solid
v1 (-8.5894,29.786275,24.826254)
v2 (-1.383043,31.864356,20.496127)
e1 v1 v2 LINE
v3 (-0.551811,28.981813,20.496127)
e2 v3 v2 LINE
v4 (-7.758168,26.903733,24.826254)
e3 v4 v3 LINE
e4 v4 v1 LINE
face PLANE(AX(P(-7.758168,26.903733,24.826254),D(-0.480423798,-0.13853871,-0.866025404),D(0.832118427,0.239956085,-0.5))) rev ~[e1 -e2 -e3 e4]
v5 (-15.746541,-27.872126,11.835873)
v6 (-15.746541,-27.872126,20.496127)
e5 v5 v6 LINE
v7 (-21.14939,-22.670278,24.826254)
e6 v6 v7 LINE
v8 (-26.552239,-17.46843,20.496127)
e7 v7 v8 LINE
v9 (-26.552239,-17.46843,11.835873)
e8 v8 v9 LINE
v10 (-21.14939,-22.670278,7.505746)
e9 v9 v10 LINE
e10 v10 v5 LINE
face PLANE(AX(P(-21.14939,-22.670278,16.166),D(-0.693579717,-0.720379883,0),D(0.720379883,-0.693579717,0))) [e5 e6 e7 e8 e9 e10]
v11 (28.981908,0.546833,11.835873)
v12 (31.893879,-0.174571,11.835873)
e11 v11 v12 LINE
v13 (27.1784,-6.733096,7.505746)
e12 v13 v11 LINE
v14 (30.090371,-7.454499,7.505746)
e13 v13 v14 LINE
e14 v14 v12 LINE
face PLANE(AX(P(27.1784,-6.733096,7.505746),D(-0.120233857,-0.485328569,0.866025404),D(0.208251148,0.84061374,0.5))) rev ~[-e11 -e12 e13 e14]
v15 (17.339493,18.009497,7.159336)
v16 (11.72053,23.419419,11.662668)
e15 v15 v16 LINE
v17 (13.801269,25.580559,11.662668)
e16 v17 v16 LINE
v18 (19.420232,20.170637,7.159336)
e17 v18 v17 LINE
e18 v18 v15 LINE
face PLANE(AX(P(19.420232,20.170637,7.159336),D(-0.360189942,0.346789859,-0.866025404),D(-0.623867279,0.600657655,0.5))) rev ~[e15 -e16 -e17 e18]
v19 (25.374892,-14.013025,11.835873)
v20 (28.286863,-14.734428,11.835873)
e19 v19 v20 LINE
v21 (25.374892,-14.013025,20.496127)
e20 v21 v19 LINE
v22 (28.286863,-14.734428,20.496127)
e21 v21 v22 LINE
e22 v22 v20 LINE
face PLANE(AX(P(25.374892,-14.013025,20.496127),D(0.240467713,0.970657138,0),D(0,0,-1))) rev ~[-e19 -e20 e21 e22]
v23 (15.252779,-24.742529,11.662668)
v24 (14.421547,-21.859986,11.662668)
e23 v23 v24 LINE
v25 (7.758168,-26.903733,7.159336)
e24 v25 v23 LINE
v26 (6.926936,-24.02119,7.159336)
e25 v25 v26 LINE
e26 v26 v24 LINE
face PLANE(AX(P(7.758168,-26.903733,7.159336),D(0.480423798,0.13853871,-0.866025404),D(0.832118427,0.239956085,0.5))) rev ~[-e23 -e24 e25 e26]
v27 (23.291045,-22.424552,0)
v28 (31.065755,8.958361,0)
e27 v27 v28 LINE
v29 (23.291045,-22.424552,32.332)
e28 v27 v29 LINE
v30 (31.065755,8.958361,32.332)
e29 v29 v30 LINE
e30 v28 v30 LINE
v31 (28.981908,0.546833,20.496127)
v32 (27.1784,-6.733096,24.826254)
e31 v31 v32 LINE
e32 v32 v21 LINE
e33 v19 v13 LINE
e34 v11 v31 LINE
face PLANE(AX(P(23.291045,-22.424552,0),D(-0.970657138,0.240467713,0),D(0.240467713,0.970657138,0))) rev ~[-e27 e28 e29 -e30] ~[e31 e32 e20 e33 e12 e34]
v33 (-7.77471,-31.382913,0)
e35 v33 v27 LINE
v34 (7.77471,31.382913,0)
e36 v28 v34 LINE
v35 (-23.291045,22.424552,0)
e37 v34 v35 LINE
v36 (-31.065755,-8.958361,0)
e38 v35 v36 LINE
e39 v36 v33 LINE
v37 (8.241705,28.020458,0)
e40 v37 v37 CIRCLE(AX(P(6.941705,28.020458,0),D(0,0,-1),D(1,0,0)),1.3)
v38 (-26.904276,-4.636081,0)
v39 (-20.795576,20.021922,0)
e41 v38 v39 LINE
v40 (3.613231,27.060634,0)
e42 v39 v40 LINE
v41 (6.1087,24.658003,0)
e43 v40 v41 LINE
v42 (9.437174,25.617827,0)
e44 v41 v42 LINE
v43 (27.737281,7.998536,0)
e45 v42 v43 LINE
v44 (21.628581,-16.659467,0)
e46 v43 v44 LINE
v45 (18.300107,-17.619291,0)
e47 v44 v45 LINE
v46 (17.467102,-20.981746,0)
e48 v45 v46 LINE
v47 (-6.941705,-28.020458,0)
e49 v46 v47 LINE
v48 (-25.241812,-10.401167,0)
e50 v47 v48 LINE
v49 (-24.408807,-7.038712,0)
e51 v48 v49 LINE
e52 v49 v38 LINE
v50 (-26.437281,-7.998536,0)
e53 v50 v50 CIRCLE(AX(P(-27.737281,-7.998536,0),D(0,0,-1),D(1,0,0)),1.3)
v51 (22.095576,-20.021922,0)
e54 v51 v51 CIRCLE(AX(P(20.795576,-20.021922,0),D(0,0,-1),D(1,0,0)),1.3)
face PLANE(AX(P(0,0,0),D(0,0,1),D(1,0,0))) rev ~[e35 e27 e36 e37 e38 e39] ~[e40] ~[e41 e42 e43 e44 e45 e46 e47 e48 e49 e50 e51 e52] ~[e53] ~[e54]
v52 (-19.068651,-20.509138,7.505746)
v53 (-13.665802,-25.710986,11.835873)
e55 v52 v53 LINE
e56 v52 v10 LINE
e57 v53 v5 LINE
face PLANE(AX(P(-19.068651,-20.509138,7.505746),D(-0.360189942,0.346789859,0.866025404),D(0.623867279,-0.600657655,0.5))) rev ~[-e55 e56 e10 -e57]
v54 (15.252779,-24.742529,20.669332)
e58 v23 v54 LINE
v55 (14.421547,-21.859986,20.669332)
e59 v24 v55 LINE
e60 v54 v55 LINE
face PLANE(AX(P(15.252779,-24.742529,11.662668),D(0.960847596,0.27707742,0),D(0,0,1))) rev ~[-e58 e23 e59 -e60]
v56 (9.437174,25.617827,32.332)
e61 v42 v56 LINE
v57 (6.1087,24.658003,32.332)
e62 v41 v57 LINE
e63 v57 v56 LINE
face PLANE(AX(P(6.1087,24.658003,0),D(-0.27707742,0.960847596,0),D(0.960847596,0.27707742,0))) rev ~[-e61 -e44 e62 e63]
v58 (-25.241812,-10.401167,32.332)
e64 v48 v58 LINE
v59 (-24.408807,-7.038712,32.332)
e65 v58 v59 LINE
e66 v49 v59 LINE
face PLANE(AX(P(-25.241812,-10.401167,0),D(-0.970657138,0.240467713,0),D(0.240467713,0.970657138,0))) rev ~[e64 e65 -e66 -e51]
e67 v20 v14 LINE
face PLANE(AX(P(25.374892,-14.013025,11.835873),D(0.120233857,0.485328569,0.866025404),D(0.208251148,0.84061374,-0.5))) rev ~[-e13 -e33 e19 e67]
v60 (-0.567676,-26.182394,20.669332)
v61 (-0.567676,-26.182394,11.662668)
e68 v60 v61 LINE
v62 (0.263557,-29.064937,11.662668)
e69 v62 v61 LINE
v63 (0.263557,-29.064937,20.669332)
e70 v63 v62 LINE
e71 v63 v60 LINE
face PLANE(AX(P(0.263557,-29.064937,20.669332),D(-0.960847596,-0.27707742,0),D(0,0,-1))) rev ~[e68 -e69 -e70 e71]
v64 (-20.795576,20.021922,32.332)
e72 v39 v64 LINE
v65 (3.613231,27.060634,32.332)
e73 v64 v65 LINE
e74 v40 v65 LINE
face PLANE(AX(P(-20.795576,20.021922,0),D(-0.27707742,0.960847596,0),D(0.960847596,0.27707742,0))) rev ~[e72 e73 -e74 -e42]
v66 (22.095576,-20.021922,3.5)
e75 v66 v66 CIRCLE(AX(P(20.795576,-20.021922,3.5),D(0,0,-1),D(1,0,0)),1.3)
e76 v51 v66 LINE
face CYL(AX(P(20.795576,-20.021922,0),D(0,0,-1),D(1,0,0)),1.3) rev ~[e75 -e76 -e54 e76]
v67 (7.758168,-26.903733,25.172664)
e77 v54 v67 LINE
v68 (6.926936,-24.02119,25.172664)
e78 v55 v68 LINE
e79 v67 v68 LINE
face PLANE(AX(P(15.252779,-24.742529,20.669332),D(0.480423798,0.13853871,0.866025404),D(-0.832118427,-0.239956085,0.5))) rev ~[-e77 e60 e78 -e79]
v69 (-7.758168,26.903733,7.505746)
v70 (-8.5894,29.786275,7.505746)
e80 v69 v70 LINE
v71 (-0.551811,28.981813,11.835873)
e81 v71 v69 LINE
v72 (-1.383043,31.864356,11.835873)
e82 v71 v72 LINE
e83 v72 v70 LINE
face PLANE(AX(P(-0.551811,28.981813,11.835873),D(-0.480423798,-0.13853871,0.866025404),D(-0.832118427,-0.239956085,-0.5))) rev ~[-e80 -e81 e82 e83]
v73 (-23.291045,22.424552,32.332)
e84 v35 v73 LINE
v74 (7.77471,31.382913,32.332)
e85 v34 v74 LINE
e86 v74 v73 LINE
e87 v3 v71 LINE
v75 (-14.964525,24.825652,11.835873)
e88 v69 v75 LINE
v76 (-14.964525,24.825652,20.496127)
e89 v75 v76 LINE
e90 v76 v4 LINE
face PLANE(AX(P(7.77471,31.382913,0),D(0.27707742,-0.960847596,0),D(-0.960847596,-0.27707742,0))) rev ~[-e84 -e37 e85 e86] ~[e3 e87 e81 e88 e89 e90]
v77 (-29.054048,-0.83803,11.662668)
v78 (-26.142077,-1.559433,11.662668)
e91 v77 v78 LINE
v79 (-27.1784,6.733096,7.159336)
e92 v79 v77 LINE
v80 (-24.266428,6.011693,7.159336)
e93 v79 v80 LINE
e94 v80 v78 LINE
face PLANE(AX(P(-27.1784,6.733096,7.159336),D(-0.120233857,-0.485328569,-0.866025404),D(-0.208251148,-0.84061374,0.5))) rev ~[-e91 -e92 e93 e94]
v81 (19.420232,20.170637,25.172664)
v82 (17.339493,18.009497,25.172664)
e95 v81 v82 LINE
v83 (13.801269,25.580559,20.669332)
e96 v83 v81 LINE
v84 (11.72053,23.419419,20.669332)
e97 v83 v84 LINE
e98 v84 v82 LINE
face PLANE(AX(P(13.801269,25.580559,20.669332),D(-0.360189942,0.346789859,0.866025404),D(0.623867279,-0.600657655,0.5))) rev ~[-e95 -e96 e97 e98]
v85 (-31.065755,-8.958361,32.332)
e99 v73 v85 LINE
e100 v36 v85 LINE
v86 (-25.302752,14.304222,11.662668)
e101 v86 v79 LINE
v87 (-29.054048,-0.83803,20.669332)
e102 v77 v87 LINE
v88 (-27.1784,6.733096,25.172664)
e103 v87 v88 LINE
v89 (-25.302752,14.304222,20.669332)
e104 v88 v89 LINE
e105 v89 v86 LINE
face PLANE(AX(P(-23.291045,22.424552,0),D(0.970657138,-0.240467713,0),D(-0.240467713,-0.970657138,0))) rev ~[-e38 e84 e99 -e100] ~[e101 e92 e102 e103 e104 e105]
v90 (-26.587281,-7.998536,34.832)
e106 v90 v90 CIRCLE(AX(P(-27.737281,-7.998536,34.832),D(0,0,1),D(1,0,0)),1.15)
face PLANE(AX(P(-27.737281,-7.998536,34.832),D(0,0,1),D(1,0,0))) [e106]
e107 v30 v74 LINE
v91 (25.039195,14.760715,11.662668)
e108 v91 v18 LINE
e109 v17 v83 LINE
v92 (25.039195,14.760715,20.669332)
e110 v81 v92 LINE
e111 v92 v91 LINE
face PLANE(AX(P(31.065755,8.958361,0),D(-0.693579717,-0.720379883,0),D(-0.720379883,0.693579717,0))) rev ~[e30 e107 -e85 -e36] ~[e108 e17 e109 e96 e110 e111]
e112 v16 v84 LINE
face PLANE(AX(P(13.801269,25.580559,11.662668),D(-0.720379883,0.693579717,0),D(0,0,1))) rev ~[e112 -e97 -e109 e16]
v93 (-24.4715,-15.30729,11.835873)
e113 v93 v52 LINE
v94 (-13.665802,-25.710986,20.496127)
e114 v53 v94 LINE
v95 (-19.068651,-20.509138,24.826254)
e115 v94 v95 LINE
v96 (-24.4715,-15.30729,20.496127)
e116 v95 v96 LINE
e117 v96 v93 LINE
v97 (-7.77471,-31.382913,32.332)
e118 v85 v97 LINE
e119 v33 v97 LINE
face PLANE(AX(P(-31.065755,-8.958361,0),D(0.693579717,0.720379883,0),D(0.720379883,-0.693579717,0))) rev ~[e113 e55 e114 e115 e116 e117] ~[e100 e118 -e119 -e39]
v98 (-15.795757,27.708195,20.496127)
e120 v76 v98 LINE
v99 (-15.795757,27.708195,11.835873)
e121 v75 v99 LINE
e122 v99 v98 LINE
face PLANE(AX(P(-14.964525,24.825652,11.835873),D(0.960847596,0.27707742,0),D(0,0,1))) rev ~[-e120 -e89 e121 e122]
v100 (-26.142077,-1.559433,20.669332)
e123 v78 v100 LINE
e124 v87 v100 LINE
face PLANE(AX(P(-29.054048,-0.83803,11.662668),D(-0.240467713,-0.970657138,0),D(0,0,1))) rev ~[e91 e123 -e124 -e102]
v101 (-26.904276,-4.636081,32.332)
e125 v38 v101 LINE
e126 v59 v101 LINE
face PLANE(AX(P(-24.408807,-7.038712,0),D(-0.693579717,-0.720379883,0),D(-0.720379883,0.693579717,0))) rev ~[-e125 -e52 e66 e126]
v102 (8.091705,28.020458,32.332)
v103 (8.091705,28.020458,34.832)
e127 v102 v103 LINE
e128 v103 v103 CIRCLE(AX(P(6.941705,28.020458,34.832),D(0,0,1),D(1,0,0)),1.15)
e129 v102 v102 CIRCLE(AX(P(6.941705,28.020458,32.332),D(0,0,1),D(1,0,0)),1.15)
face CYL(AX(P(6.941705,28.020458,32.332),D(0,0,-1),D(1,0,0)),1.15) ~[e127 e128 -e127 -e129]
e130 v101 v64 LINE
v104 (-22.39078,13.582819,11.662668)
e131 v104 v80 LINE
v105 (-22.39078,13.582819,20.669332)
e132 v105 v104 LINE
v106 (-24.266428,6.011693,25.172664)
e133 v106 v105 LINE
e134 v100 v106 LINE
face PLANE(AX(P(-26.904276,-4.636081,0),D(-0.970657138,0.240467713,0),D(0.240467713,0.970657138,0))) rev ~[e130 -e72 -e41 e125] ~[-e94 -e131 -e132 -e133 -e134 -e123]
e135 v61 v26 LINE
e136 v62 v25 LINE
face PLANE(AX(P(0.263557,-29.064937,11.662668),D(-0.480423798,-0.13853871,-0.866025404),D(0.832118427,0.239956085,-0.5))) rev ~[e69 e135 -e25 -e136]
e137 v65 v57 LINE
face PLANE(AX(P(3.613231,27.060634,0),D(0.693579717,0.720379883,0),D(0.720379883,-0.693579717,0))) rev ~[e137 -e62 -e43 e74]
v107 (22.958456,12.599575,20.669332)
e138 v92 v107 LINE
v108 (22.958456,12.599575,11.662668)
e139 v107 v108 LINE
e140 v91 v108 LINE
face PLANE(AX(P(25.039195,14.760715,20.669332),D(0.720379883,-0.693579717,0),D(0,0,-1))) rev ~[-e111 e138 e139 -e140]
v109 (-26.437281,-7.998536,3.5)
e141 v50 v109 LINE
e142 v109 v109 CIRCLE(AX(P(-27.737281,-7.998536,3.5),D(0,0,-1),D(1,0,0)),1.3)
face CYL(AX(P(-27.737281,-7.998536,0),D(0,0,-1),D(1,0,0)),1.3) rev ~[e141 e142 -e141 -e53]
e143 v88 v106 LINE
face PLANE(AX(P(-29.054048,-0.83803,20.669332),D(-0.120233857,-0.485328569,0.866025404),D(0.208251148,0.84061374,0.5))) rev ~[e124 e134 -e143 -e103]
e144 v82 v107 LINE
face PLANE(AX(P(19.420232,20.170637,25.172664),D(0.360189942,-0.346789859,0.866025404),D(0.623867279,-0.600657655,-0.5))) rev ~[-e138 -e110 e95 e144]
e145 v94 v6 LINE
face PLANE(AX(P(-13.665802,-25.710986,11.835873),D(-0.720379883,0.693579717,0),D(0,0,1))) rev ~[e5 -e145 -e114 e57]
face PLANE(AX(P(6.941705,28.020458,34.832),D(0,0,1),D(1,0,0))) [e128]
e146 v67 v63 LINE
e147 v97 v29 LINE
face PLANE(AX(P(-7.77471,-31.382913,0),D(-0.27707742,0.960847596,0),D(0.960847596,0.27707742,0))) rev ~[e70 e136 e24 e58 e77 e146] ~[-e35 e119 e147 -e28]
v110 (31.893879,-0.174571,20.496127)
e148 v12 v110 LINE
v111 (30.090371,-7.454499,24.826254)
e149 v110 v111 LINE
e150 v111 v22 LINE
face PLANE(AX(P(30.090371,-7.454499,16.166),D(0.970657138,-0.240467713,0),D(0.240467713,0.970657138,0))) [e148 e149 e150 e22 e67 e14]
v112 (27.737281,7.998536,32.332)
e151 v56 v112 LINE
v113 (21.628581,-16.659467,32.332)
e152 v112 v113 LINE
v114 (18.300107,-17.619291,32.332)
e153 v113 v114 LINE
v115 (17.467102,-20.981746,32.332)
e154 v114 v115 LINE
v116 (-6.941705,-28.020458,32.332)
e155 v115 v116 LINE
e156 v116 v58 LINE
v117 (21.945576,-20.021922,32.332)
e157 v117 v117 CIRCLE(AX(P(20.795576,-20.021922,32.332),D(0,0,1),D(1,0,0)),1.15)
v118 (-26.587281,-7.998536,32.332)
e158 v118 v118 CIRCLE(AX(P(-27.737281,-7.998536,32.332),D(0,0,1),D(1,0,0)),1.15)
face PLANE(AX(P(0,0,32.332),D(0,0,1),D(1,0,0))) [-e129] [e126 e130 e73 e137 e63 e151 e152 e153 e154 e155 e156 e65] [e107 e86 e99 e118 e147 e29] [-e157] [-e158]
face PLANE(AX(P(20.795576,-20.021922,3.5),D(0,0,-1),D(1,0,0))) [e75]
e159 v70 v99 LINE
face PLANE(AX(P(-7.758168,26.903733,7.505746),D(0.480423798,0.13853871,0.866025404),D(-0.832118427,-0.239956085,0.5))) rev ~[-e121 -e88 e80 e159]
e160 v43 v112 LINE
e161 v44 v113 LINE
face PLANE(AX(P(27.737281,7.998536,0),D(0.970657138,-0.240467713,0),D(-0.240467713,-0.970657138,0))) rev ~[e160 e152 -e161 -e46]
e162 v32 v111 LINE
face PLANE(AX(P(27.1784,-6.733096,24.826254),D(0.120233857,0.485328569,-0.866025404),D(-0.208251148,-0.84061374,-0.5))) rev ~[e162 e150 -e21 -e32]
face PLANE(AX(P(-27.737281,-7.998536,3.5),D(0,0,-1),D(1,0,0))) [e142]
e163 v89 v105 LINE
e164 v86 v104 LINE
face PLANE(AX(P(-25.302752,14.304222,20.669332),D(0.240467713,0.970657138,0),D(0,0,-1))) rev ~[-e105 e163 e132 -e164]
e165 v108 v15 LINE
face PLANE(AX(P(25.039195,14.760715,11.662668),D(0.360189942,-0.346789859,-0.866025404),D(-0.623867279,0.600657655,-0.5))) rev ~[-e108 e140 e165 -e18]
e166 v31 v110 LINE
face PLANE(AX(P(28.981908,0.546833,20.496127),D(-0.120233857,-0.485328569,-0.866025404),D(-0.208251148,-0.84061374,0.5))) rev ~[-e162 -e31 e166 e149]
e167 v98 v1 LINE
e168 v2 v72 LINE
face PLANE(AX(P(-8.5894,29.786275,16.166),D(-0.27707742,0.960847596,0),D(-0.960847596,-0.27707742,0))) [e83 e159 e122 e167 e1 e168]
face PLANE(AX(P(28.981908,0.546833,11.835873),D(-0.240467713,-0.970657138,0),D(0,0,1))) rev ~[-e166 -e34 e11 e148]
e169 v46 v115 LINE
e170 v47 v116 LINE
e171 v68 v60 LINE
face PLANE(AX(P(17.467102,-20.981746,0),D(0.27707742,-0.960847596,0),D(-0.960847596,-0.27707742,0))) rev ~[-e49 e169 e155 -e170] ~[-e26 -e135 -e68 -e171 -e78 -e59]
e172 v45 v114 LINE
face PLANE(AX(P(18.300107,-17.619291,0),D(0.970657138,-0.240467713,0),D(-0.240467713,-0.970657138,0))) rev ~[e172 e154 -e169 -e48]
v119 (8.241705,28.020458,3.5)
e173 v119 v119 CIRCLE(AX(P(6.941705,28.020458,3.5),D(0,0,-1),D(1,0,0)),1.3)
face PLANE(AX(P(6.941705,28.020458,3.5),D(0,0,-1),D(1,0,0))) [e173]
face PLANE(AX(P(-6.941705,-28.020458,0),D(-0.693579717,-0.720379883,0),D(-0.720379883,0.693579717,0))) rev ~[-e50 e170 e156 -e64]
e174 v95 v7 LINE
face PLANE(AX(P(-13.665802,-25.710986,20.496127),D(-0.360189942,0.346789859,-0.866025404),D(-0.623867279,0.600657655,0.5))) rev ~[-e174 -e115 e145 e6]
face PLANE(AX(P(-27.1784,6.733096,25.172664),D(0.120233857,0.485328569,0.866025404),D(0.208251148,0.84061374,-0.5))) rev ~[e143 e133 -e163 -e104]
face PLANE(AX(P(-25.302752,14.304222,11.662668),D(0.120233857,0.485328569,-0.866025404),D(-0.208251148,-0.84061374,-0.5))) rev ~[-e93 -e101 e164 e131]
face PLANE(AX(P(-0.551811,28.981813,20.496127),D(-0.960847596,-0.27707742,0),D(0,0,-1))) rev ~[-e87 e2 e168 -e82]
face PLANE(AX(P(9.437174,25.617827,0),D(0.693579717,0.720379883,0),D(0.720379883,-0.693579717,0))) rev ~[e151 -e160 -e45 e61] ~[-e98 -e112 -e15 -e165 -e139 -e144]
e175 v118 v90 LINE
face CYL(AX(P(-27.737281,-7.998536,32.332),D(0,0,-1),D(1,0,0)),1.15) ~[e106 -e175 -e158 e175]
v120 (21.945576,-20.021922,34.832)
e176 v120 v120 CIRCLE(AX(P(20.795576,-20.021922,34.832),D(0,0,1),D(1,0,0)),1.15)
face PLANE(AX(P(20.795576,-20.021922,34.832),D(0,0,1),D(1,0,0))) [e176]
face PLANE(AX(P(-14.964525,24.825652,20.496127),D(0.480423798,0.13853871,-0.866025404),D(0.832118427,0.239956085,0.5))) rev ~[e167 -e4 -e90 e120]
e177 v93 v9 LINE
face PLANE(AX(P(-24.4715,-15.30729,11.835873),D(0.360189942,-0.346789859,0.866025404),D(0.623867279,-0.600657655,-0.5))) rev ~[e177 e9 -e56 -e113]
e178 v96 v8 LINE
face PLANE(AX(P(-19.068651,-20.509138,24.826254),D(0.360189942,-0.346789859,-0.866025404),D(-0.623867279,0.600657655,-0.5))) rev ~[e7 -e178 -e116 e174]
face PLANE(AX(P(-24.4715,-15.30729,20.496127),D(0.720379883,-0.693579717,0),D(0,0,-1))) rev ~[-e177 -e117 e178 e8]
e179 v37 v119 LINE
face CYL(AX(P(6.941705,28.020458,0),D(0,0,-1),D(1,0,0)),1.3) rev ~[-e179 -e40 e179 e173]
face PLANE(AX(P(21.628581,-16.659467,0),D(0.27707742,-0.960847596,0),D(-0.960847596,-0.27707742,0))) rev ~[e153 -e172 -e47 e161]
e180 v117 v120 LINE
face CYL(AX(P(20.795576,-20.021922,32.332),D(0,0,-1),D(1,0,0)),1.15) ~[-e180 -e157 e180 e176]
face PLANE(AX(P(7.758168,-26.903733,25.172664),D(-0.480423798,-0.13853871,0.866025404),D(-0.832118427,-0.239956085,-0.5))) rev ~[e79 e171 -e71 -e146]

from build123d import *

# Parameters (mm, degrees)
F1_DEPTH  = 32.332
F2_R      = 1.3
F3_DEPTH  = 3.5
F4_R      = 1.15
F5_DEPTH  = 2.5
F12_DEPTH = 3
F13_DEPTH = 3
F14_DEPTH = 3
F15_DEPTH = 3
F16_DEPTH = 3
F17_DEPTH = 3


# Not quite as in the source:
# - a feature names something its author has since deleted; it is built from what else it names


with BuildPart() as f1:
    # F0 (on Top) → F1 (new body)
    with BuildSketch(Plane.XY):
        Polygon((-7.7747095404, -31.3829129447), (23.2910450847, -22.4245524414), (31.0657546251, 8.9583605033), (7.7747095404, 31.3829129447), (-23.2910450847, 22.4245524414), (-31.0657546251, -8.9583605033), align=None)
        Polygon((21.6285805621, -16.6594668643), (20.7955759684, -20.0219218227), (17.4671022586, -20.9817461623), (-6.9417049468, -28.0204579863), (-25.241811799, -10.4011667824), (-27.7372809153, -7.9985361637), (-26.9042763216, -4.6360812053), (-20.7955759684, 20.0219218227), (3.613231237, 27.0606336467), (6.9417049468, 28.0204579863), (9.437174063, 25.6178273676), (27.7372809153, 7.9985361637), align=None, mode=Mode.SUBTRACT)
        Polygon((-27.7372809153, -7.9985361637), (-25.241811799, -10.4011667824), (-24.4088072054, -7.038711824), (-26.9042763216, -4.6360812053), align=None)
        Polygon((6.1087003532, 24.658003028), (9.437174063, 25.6178273676), (6.9417049468, 28.0204579863), (3.613231237, 27.0606336467), align=None)
        Polygon((17.4671022586, -20.9817461623), (20.7955759684, -20.0219218227), (21.6285805621, -16.6594668643), (18.3001068522, -17.619291204), align=None)
    extrude(amount=F1_DEPTH)

    # F2 (on face) → F3 (cut)
    with BuildSketch(Plane(origin=(0, 0, 0), x_dir=(1, 0, 0), z_dir=(0, 0, -1))):
        with Locations((20.7955759684, 20.0219218227)):
            Circle(F2_R)
        with Locations((6.9417049468, -28.0204579863)):
            Circle(F2_R)
        with Locations((-27.7372809153, 7.9985361637)):
            Circle(F2_R)
    extrude(amount=-F3_DEPTH, mode=Mode.SUBTRACT)

    # F4 (on face) → F5 (join)
    with BuildSketch(Plane.XY.offset(32.332)):
        with Locations((6.9417049468, 28.0204579863)):
            Circle(F4_R)
        with Locations((20.7955759684, -20.0219218227)):
            Circle(F4_R)
        with Locations((-27.7372809153, -7.9985361637)):
            Circle(F4_R)
    extrude(amount=F5_DEPTH)

    # F9 (on face) → F12 (join)
    with BuildSketch(Plane(origin=(27.1783998549, -6.7330959691, 0), x_dir=(0.2404677132, 0.9706571377, 0), z_dir=(0.9706571377, -0.2404677132, 0))):
        Polygon((-7.5, 20.4961270189), (-7.5, 11.8358729811), (0, 7.5057459622), (7.5, 11.8358729811), (7.5, 20.4961270189), (0, 24.8262540378), align=None)
    extrude(amount=F12_DEPTH)

    # F7 (on face) → F13 (join)
    with BuildSketch(Plane(origin=(-7.7581677721, 26.9037326931, 0), x_dir=(-0.9608475962, -0.2770774204, 0), z_dir=(-0.2770774204, 0.9608475962, 0))):
        Polygon((-7.5, 20.4961270189), (-7.5, 11.8358729811), (0, 7.5057459622), (7.5, 11.8358729811), (7.5, 20.4961270189), (0, 24.8262540378), align=None)
    extrude(amount=F13_DEPTH)

    # F11 (on face) → F14 (join)
    with BuildSketch(Plane(origin=(-19.4202320828, -20.170636724, 0), x_dir=(0.720379883, -0.6935797172, 0), z_dir=(-0.6935797172, -0.720379883, 0))):
        Polygon((-7.0119504524, 20.4961270189), (-7.0119504524, 11.8358729811), (0.4880495476, 7.5057459622), (7.9880495476, 11.8358729811), (7.9880495476, 20.4961270189), (0.4880495476, 24.8262540378), align=None)
    extrude(amount=F14_DEPTH)

    # F10 (on face) → F15 (cut, through all)
    with BuildSketch(Plane(origin=(7.7581677721, -26.9037326931, 0), x_dir=(0.9608475962, 0.2770774204, 0), z_dir=(0.2770774204, -0.9608475962, 0))):
        Polygon((-7.8, 20.6693320997), (-7.8, 11.6626679003), (0, 7.1593358006), (7.8, 11.6626679003), (7.8, 20.6693320997), (0, 25.1726641994), align=None)
    extrude(amount=-F15_DEPTH, mode=Mode.SUBTRACT)

    # F6 (on face) → F16 (cut, through all)
    with BuildSketch(Plane(origin=(-27.1783998549, 6.7330959691, 0), x_dir=(-0.2404677132, -0.9706571377, 0), z_dir=(-0.9706571377, 0.2404677132, 0))):
        Polygon((-7.8, 20.6693320997), (-7.8, 11.6626679003), (0, 7.1593358006), (7.8, 11.6626679003), (7.8, 20.6693320997), (0, 25.1726641994), align=None)
    extrude(amount=-F16_DEPTH, mode=Mode.SUBTRACT)

    # F8 (on face) → F17 (cut, through all)
    with BuildSketch(Plane(origin=(19.4202320828, 20.170636724, 0), x_dir=(-0.720379883, 0.6935797172, 0), z_dir=(0.6935797172, 0.720379883, 0))):
        Polygon((-7.8, 20.6693320997), (-7.8, 11.6626679003), (0, 7.1593358006), (7.8, 11.6626679003), (7.8, 20.6693320997), (0, 25.1726641994), align=None)
    extrude(amount=-F17_DEPTH, mode=Mode.SUBTRACT)


solid = f1.part
